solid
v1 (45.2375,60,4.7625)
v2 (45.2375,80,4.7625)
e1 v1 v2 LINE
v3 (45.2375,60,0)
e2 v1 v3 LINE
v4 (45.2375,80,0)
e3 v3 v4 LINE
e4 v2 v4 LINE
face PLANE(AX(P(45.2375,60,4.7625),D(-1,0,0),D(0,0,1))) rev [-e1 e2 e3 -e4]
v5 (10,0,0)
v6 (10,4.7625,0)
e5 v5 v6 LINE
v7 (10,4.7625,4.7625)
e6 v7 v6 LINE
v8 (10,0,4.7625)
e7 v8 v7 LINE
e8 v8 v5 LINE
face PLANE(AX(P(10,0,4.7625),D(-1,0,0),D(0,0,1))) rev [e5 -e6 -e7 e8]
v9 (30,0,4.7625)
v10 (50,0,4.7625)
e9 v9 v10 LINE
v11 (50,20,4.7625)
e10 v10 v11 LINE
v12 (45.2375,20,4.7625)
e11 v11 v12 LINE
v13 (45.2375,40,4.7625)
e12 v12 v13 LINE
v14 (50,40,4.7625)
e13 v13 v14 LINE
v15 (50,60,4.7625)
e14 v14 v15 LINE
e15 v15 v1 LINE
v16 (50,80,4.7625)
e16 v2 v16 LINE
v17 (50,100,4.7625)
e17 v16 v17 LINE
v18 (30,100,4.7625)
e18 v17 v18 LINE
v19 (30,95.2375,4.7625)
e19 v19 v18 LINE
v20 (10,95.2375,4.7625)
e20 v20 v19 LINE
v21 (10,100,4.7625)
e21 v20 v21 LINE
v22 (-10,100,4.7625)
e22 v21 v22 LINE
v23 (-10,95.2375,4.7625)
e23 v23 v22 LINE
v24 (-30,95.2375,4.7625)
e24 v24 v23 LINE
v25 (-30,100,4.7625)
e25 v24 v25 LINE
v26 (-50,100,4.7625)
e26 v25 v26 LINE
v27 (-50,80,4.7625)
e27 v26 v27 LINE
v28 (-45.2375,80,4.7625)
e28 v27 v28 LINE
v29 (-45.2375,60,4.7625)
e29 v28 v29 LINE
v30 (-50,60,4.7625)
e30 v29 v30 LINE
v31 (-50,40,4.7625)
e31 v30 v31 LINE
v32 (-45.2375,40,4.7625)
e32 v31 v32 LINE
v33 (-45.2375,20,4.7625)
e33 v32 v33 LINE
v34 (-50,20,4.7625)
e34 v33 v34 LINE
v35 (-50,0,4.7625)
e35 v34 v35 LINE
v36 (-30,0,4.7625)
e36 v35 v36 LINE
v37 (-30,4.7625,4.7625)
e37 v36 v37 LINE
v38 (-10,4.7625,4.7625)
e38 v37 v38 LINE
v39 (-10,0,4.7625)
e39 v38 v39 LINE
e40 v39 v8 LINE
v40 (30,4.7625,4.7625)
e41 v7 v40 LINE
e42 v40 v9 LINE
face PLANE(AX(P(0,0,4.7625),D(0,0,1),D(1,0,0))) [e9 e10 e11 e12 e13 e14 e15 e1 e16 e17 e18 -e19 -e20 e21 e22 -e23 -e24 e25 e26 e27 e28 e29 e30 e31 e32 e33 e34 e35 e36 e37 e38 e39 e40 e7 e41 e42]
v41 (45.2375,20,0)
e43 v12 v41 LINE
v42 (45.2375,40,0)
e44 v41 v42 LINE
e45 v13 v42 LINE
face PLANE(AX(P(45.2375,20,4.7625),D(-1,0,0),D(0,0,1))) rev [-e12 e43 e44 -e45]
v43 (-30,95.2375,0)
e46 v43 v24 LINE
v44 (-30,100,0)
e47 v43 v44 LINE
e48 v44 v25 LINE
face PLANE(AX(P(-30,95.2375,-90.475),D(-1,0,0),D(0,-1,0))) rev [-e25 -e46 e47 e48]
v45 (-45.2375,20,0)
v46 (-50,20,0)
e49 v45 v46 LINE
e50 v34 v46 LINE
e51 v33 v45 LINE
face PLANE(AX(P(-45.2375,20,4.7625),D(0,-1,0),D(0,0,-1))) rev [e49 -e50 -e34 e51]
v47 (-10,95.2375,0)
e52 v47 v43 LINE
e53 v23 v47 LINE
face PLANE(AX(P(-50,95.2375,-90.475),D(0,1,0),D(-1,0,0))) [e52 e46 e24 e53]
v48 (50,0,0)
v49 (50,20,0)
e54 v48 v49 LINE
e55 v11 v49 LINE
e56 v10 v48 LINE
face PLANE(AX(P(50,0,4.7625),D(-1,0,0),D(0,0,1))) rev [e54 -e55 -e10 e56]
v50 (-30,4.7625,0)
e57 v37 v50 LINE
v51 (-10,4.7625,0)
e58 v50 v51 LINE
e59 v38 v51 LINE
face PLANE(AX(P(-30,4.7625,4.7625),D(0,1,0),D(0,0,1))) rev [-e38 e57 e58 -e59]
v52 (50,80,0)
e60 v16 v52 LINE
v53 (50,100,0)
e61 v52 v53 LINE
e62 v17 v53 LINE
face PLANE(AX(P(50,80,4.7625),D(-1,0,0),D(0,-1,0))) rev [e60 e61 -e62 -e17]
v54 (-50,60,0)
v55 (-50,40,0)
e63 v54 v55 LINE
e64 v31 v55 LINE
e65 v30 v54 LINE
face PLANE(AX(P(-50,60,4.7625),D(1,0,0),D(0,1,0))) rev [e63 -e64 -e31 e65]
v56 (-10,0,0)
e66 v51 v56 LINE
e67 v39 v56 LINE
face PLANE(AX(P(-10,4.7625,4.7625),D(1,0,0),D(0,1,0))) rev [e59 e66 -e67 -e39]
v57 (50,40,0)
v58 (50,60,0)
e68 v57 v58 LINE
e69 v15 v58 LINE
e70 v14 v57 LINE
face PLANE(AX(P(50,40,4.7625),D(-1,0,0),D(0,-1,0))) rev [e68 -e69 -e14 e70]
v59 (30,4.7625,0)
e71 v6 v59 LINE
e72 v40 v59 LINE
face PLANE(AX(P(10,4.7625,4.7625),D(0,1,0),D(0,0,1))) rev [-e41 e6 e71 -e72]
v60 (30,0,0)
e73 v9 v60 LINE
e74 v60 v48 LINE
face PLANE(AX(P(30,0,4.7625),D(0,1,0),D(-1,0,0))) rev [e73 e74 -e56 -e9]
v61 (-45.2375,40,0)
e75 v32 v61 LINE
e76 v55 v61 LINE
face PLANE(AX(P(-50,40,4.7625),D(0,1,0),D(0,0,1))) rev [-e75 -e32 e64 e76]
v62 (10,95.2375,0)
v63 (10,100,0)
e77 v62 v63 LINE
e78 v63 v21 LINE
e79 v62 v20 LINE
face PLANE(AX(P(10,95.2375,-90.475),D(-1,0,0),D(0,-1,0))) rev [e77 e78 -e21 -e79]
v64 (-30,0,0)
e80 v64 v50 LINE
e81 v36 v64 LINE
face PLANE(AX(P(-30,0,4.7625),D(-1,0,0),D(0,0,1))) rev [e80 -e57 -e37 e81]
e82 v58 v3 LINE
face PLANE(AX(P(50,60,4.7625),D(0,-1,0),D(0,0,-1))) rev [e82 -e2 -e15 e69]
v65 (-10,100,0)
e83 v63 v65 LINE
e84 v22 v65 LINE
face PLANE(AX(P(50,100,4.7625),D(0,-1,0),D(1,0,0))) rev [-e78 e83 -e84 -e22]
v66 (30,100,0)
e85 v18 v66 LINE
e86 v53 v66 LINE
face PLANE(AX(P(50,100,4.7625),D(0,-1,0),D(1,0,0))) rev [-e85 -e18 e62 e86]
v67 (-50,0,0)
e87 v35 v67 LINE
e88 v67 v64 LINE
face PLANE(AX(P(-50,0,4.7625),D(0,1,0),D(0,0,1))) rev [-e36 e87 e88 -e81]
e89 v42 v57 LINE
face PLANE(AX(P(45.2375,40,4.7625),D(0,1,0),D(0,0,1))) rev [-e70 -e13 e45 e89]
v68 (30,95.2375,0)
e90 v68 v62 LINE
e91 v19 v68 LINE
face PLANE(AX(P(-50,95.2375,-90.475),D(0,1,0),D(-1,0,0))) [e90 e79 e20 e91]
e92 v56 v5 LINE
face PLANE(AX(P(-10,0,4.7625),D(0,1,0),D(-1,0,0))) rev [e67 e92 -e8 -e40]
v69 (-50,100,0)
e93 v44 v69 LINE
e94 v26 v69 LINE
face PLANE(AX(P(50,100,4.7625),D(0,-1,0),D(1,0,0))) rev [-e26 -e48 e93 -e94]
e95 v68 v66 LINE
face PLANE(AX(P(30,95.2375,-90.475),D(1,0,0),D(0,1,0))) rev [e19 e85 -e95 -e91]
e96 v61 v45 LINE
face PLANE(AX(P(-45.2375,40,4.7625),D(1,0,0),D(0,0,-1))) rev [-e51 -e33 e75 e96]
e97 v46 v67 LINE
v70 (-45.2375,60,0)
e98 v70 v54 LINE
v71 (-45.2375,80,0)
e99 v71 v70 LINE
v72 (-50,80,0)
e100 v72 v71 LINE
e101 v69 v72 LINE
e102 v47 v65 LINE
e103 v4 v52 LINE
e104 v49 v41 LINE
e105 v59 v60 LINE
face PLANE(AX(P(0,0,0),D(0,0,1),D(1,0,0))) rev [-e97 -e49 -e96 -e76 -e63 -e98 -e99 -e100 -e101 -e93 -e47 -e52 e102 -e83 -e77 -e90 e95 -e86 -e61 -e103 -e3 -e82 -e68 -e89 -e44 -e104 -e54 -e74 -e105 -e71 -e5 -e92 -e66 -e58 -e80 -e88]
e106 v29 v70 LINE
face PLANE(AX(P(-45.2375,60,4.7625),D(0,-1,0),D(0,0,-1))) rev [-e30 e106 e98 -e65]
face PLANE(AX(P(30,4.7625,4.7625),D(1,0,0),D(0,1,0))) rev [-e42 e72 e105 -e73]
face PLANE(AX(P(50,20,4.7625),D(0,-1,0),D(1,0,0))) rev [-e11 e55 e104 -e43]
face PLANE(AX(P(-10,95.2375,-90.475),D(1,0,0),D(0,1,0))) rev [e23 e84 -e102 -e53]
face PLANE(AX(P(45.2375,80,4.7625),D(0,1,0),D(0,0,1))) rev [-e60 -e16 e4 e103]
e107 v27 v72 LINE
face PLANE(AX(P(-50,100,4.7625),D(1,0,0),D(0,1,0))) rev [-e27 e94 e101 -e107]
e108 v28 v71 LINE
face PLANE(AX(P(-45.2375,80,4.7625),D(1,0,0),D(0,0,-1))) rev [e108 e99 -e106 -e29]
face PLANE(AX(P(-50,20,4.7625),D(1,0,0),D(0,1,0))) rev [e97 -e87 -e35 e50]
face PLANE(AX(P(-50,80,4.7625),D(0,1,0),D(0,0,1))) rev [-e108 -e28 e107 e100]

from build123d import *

# Parameters (mm, degrees)
BOSS_EXTRUDE1_DEPTH = 4.7625
CAVITY1_START       = -30
CAVITY1_OUTLINE_W   = 4.7625
CAVITY1_OUTLINE_H   = 4.7625
CAVITY1_DEPTH       = 20
CAVITY1_START_2     = 10
CAVITY1_2_OUTLINE_W = 4.7625
CAVITY1_2_OUTLINE_H = 4.7625
CAVITY1_2_DEPTH     = 20


# Read off the part's stored shape, not the designer's step: Cavity1
with BuildPart() as part:
    # Sketch1 → Boss-Extrude1 (new body)
    with BuildSketch(Plane.XY):
        Polygon((50, 40), (50, 60), (45.2375, 60), (45.2375, 80), (50, 80), (50, 100), (-50, 100), (-50, 80), (-45.2375, 80), (-45.2375, 60), (-50, 60), (-50, 40), (-45.2375, 40), (-45.2375, 20), (-50, 20), (-50, 0), (-30, 0), (-30, 4.7625), (-10, 4.7625), (-10, 0), (10, 0), (10, 4.7625), (30, 4.7625), (30, 0), (50, 0), (50, 20), (45.2375, 20), (45.2375, 40), align=None)
    extrude(amount=BOSS_EXTRUDE1_DEPTH)

    # Cavity1 outline → Cavity1 (cut)
    with BuildSketch(Plane.YZ.offset(CAVITY1_START)):
        with Locations((97.61875, 2.38125)):
            Rectangle(CAVITY1_OUTLINE_W, CAVITY1_OUTLINE_H)
    extrude(amount=CAVITY1_DEPTH, mode=Mode.SUBTRACT)

    # Cavity1 2 outline → Cavity1 2 (cut)
    with BuildSketch(Plane.YZ.offset(CAVITY1_START_2)):
        with Locations((97.61875, 2.38125)):
            Rectangle(CAVITY1_2_OUTLINE_W, CAVITY1_2_OUTLINE_H)
    extrude(amount=CAVITY1_2_DEPTH, mode=Mode.SUBTRACT)


solid = part.part
